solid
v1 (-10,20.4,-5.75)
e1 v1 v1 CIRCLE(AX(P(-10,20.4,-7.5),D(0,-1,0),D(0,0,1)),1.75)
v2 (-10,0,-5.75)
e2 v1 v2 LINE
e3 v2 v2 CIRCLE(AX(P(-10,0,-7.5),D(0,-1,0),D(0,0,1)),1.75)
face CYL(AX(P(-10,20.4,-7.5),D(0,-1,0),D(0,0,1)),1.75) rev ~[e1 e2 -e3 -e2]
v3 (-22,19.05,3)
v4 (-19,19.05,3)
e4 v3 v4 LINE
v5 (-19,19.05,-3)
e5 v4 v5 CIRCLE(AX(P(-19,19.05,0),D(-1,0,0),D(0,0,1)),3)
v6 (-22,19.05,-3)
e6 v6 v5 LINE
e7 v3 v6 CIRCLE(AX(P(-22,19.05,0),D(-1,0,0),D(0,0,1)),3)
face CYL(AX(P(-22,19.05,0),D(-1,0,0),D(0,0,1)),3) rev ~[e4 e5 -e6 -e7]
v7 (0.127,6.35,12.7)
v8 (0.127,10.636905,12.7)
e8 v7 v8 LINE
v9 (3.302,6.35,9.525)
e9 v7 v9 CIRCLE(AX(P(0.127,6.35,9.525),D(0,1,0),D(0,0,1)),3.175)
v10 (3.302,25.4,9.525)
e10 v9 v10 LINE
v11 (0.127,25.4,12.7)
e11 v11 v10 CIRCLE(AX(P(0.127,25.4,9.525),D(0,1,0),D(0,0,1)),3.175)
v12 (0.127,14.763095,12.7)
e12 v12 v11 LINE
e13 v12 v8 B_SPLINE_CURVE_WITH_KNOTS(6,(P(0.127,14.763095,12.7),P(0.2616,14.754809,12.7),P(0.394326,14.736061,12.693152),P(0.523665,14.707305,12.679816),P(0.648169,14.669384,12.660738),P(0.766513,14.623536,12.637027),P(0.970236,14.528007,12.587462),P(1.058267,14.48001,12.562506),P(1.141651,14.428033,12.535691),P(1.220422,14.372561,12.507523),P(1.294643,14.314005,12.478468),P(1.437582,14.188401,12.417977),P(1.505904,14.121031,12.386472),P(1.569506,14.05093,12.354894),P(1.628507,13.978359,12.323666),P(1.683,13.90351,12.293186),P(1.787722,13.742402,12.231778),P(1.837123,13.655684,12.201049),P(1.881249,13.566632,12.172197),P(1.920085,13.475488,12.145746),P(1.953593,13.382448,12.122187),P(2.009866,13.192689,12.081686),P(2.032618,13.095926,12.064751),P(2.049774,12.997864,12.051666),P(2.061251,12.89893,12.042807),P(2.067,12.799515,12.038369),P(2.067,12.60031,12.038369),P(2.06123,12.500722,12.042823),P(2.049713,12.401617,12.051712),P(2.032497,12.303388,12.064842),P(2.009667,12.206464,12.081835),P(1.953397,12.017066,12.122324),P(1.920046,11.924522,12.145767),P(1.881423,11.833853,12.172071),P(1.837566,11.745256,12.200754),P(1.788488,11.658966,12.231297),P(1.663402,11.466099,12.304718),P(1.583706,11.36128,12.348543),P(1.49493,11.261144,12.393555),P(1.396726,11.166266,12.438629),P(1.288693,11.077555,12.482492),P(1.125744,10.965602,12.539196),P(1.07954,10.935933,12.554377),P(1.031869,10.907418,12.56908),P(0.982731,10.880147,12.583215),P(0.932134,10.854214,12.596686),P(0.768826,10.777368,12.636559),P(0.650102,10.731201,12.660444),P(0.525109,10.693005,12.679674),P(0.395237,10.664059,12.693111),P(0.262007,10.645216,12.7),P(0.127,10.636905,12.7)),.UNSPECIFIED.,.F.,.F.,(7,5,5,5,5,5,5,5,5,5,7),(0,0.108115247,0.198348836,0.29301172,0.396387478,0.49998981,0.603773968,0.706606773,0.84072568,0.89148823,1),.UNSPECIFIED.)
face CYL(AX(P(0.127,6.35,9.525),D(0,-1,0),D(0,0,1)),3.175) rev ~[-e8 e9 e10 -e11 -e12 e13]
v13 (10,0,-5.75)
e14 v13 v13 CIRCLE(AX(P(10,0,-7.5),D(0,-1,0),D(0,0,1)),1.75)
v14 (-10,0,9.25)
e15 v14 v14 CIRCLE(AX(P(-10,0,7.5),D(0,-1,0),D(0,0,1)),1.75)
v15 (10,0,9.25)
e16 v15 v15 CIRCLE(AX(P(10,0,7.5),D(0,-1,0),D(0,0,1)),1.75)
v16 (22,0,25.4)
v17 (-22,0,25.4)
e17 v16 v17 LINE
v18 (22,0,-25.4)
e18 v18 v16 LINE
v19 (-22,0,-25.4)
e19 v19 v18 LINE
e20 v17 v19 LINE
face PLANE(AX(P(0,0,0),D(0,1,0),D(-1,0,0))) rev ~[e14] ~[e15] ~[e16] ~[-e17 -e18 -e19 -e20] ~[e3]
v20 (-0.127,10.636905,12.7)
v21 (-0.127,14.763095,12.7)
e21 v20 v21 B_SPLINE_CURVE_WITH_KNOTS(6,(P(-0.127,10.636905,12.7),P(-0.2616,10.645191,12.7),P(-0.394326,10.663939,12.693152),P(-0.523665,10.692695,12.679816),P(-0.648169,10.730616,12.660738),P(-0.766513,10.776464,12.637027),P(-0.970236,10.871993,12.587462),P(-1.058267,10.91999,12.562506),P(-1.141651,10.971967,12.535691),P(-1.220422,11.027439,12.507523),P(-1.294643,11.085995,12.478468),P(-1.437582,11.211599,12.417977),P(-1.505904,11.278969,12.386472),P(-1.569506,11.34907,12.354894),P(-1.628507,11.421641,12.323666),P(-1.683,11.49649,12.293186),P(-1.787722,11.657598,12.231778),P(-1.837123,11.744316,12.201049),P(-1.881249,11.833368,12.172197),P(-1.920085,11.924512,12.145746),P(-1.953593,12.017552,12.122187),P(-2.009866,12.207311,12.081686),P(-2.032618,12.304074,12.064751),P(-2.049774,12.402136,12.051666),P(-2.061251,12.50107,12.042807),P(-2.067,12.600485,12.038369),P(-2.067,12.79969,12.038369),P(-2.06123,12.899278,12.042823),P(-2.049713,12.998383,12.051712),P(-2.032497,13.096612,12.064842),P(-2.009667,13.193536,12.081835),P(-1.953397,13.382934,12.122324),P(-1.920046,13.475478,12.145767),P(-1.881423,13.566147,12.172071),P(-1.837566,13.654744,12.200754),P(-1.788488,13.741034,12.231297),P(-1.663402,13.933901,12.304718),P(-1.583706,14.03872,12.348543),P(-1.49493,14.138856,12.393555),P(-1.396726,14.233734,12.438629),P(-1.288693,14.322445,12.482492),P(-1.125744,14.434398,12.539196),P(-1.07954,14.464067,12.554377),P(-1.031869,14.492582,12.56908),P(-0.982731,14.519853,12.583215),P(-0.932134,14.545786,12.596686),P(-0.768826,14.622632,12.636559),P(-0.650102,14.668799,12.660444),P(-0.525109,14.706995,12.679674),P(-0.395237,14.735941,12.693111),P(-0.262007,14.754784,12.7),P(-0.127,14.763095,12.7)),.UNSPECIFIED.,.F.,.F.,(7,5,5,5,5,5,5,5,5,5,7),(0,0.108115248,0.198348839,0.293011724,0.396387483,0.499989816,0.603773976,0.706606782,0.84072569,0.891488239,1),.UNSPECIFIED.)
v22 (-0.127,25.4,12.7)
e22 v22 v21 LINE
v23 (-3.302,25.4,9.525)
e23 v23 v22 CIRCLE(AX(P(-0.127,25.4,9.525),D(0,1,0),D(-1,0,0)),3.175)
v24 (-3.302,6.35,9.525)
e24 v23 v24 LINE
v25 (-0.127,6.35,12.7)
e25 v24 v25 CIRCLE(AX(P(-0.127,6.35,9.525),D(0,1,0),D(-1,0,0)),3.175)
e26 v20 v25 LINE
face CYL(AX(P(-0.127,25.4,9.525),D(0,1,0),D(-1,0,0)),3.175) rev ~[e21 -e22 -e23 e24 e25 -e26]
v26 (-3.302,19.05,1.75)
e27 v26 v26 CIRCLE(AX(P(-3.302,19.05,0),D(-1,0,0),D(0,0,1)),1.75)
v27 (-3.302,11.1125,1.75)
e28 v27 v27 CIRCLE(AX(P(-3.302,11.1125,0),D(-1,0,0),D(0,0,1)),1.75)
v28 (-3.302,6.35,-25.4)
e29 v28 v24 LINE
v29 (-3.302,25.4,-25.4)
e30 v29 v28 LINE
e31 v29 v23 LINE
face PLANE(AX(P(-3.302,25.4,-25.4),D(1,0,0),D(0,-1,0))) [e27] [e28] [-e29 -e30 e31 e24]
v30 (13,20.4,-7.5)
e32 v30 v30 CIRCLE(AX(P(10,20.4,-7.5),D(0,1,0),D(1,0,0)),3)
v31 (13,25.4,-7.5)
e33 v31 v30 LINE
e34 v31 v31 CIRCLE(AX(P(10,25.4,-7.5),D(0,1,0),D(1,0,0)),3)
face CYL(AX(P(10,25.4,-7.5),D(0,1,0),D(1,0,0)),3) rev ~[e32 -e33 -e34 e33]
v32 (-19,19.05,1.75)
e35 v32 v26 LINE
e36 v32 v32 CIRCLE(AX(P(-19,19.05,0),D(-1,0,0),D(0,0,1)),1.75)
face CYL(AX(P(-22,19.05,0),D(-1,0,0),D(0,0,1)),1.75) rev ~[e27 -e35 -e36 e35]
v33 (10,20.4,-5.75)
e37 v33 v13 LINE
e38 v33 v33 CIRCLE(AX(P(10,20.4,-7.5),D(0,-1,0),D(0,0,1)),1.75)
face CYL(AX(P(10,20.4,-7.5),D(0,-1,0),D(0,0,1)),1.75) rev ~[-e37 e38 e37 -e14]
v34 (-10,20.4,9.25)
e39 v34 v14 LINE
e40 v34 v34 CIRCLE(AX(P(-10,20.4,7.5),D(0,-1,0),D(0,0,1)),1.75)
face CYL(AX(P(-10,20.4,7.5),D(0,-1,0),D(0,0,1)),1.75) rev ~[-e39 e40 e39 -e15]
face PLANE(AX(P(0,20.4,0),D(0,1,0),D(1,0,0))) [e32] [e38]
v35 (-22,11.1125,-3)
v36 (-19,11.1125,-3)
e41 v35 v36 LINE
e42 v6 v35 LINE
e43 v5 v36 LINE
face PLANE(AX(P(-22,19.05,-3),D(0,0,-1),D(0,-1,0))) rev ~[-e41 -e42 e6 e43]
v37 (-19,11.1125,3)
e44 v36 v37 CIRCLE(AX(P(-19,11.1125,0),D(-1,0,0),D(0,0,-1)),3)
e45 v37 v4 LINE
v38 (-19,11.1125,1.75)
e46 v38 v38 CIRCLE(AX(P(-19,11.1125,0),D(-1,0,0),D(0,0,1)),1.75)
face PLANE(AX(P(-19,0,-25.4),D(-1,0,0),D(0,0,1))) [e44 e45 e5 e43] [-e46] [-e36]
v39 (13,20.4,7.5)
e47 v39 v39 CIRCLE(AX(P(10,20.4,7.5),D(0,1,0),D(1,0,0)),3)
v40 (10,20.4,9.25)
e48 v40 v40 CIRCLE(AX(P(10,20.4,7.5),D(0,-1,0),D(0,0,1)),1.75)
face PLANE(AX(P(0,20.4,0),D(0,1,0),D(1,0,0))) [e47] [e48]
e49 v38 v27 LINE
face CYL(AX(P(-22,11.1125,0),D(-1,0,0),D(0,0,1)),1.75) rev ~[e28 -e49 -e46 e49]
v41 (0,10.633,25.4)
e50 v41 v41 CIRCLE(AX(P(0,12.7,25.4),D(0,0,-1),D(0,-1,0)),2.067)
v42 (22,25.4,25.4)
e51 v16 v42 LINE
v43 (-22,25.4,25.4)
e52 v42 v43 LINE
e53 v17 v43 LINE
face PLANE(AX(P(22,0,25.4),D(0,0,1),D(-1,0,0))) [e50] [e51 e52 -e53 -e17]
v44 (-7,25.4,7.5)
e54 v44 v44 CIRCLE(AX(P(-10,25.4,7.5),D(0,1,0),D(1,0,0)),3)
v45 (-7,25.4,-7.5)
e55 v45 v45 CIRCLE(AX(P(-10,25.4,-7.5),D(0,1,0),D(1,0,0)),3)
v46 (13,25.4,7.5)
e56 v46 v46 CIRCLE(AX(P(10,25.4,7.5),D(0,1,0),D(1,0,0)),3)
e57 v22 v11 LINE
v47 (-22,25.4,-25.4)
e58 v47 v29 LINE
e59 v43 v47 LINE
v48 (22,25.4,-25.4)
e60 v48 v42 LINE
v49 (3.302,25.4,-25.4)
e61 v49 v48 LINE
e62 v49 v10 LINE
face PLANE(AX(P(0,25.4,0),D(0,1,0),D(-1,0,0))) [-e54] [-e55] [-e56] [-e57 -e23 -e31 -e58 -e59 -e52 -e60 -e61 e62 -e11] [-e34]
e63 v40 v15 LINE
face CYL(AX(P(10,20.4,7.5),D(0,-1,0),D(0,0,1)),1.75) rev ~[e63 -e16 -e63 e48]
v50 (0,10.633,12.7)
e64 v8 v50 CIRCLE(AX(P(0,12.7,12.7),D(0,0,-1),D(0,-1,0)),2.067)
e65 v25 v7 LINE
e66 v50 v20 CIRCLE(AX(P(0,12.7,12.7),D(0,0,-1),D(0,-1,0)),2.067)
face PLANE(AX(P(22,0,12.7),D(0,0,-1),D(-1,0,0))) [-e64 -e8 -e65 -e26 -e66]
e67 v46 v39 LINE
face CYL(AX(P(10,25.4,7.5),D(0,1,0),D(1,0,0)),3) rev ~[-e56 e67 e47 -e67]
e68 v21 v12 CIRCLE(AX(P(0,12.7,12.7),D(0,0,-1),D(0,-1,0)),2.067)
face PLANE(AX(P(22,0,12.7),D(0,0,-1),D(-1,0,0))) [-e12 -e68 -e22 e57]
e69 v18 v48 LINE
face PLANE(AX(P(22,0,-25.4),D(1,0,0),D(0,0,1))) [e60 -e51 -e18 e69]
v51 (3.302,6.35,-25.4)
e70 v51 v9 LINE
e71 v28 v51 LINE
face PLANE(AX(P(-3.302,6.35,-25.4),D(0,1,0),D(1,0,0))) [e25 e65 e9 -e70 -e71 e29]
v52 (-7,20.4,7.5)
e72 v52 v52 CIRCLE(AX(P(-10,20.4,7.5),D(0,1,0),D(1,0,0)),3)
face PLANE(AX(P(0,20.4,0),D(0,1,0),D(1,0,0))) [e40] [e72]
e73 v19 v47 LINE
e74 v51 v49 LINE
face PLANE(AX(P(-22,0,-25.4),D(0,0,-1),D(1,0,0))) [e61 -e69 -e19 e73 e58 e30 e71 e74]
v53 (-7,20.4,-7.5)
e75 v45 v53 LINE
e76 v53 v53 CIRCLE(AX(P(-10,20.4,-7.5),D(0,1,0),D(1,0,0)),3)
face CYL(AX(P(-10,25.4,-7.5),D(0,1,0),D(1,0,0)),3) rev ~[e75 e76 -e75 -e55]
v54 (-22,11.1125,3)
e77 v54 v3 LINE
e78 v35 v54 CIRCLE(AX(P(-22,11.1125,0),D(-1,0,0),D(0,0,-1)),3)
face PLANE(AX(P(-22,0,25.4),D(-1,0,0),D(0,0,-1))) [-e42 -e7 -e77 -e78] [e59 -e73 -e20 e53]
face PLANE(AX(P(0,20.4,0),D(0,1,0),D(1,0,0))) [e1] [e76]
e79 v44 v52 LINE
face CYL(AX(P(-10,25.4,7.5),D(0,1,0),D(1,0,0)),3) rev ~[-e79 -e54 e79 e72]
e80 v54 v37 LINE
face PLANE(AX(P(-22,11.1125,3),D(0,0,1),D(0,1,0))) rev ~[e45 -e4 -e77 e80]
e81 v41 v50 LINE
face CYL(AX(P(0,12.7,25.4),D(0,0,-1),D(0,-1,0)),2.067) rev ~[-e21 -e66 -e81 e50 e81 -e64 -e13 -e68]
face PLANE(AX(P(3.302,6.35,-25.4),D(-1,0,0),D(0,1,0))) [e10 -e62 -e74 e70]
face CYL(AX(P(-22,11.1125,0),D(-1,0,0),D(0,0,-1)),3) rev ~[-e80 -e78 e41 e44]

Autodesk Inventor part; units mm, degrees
ref_plane "YZ Plane" through (0, 0, 0) normal (1, 0, 0) x (0, 1, 0)
ref_plane "XZ Plane" through (0, 0, 0) normal (0, 1, 0) x (-1, 0, 0)
ref_plane "XY Plane" through (0, 0, 0) normal (0, 0, 1) x (1, 0, 0)
sketch "Sketch2" plane through (0, 0, 0) normal (0, 1, 0) x (-1, 0, 0)
  line L0 (-22, 25.4) -> (22, 25.4)
  line L1 (22, 25.4) -> (22, -25.4)
  line L2 (22, -25.4) -> (-22, -25.4)
  line L3 (-22, -25.4) -> (-22, 25.4)
  line L4 (-22, 25.4) -> (22, -25.4) construction
  line L5 (22, 25.4) -> (-22, -25.4) construction
  point P0 (0, 0)
  dimension "d0" = 50.8
  dimension "d1" = 44
extrude "Extrusion1" add sketch "Sketch2" along normal blind 25.4
sketch "Sketch3" plane through (-22, 0, 25.4) normal (0, 0, 1) x (1, 0, 0)
  line L0 (0, 25.4) -> (44, 25.4) construction
  line L1 (0, 0) -> (44, 0) construction
  line L2 (44, 0) -> (44, 25.4) construction
  line L3 (44, 25.4) -> (0, 25.4) construction
  line L4 (0, 25.4) -> (0, 0) construction
  line L5 (0, 0) -> (44, 25.4) construction
  line L6 (44, 0) -> (0, 25.4) construction
  line L7 (44, 0) -> (0, 0) projected
  point P0 (22, 0)
  point P1 (22, 12.7)
hole "Hole1" at (0, 12.7, 25.4) direction (0, 0, -1) diameter 4.134 depth 12.7 tip angle 118 thread size "M5x0.8" class "6H" standard "ANSI Metric M Profile"
sketch "Sketch4" plane through (0, 25.4, 0) normal (0, 1, 0) x (1, 0, 0)
  line L0 (10, -7.5) -> (10, 7.5) construction
  line L1 (10, 7.5) -> (-10, 7.5) construction
  line L2 (-10, 7.5) -> (-10, -7.5) construction
  line L3 (-10, -7.5) -> (10, -7.5) construction
  line L4 (10, -7.5) -> (-10, 7.5) construction
  line L5 (10, 7.5) -> (-10, -7.5) construction
  circle A0 centre (-10, 7.5) radius 3
  circle A1 centre (10, 7.5) radius 3
  circle A2 centre (10, -7.5) radius 3
  circle A3 centre (-10, -7.5) radius 3
  point P0 (0, 0)
  dimension "d11" = 20
  dimension "d12" = 15
  dimension "d13" = 6
  dimension "d14" = 6
  dimension "d15" = 6
  dimension "d16" = 6
extrude "Extrusion2" cut sketch "Sketch4" against normal blind 5
sketch "Sketch5" plane through (-10, 20.4, 7.5) normal (0, 1, 0) x (1, 0, 0)
  circle A0 centre (0, 15) radius 3 projected
  circle A1 centre (20, 0) radius 3 projected
  circle A2 centre (20, 15) radius 3 projected
  point P0 (10, 7.5)
  point P1 (0, 0)
hole "Hole2" at (-10, 20.4, -7.5) at (-10, 20.4, 7.5) at (10, 20.4, 7.5) at (10, 20.4, -7.5) direction (0, -1, 0) diameter 3.5 end through all
sketch "Sketch8" plane through (-22, 0, -25.4) normal (-1, 0, 0) x (0, 0, 1)
  circle A0 centre (25.4, 19.05) radius 1.75
  line L0 (0, 25.4) -> (50.8, 25.4) projected
  line L1 (0, 0) -> (0, 25.4) projected
  circle A1 centre (25.4, 11.1125) radius 1.75
  arc A2 (28.4, 19.05) -> (22.4, 19.05) centre (25.4, 19.05) ccw
  arc A3 (22.4, 11.1125) -> (28.4, 11.1125) centre (25.4, 11.1125) ccw
  line L2 (28.4, 11.1125) -> (28.4, 19.05)
  line L3 (22.4, 19.05) -> (22.4, 11.1125)
  point P0 (25.4, 0)
  dimension "d31" = 3.5
  dimension "d32" = 6.35
  dimension "d33" = 25.4
  dimension "d41" = 3.5
  dimension "d42" = 7.9375
  dimension "d43" = 6
  dimension "d44" = 6
extrude "Extrusion4" cut sketch "Sketch8" against normal blind 22 contours A0 | A1
sketch "Sketch9" plane through (22, 0, -25.4) normal (0, 0, -1) x (-1, 0, 0)
  line L0 (44, 25.4) -> (0, 25.4) projected
  line L1 (18.698, 25.4) -> (25.302, 25.4)
  line L2 (25.302, 25.4) -> (25.302, 6.35)
  line L3 (25.302, 6.35) -> (18.698, 6.35)
  line L4 (18.698, 6.35) -> (18.698, 25.4)
  line L5 (44, 0) -> (44, 25.4) projected
  point P0 (22, 0)
  point P1 (22, 6.35)
  dimension "d36" = 6.604
  dimension "d37" = 22
  dimension "d38" = 19.05
extrude "Extrusion5" cut sketch "Sketch9" against normal blind 38.1
extrude "Extrusion6" cut sketch "Sketch8" against normal blind 3
fillet "Fillet1" radius 3.175 2 edges at (3.302, 15.875, 12.7) (-3.302, 15.875, 12.7)
properties part number "Mass 1" material "Steel, Mild"
